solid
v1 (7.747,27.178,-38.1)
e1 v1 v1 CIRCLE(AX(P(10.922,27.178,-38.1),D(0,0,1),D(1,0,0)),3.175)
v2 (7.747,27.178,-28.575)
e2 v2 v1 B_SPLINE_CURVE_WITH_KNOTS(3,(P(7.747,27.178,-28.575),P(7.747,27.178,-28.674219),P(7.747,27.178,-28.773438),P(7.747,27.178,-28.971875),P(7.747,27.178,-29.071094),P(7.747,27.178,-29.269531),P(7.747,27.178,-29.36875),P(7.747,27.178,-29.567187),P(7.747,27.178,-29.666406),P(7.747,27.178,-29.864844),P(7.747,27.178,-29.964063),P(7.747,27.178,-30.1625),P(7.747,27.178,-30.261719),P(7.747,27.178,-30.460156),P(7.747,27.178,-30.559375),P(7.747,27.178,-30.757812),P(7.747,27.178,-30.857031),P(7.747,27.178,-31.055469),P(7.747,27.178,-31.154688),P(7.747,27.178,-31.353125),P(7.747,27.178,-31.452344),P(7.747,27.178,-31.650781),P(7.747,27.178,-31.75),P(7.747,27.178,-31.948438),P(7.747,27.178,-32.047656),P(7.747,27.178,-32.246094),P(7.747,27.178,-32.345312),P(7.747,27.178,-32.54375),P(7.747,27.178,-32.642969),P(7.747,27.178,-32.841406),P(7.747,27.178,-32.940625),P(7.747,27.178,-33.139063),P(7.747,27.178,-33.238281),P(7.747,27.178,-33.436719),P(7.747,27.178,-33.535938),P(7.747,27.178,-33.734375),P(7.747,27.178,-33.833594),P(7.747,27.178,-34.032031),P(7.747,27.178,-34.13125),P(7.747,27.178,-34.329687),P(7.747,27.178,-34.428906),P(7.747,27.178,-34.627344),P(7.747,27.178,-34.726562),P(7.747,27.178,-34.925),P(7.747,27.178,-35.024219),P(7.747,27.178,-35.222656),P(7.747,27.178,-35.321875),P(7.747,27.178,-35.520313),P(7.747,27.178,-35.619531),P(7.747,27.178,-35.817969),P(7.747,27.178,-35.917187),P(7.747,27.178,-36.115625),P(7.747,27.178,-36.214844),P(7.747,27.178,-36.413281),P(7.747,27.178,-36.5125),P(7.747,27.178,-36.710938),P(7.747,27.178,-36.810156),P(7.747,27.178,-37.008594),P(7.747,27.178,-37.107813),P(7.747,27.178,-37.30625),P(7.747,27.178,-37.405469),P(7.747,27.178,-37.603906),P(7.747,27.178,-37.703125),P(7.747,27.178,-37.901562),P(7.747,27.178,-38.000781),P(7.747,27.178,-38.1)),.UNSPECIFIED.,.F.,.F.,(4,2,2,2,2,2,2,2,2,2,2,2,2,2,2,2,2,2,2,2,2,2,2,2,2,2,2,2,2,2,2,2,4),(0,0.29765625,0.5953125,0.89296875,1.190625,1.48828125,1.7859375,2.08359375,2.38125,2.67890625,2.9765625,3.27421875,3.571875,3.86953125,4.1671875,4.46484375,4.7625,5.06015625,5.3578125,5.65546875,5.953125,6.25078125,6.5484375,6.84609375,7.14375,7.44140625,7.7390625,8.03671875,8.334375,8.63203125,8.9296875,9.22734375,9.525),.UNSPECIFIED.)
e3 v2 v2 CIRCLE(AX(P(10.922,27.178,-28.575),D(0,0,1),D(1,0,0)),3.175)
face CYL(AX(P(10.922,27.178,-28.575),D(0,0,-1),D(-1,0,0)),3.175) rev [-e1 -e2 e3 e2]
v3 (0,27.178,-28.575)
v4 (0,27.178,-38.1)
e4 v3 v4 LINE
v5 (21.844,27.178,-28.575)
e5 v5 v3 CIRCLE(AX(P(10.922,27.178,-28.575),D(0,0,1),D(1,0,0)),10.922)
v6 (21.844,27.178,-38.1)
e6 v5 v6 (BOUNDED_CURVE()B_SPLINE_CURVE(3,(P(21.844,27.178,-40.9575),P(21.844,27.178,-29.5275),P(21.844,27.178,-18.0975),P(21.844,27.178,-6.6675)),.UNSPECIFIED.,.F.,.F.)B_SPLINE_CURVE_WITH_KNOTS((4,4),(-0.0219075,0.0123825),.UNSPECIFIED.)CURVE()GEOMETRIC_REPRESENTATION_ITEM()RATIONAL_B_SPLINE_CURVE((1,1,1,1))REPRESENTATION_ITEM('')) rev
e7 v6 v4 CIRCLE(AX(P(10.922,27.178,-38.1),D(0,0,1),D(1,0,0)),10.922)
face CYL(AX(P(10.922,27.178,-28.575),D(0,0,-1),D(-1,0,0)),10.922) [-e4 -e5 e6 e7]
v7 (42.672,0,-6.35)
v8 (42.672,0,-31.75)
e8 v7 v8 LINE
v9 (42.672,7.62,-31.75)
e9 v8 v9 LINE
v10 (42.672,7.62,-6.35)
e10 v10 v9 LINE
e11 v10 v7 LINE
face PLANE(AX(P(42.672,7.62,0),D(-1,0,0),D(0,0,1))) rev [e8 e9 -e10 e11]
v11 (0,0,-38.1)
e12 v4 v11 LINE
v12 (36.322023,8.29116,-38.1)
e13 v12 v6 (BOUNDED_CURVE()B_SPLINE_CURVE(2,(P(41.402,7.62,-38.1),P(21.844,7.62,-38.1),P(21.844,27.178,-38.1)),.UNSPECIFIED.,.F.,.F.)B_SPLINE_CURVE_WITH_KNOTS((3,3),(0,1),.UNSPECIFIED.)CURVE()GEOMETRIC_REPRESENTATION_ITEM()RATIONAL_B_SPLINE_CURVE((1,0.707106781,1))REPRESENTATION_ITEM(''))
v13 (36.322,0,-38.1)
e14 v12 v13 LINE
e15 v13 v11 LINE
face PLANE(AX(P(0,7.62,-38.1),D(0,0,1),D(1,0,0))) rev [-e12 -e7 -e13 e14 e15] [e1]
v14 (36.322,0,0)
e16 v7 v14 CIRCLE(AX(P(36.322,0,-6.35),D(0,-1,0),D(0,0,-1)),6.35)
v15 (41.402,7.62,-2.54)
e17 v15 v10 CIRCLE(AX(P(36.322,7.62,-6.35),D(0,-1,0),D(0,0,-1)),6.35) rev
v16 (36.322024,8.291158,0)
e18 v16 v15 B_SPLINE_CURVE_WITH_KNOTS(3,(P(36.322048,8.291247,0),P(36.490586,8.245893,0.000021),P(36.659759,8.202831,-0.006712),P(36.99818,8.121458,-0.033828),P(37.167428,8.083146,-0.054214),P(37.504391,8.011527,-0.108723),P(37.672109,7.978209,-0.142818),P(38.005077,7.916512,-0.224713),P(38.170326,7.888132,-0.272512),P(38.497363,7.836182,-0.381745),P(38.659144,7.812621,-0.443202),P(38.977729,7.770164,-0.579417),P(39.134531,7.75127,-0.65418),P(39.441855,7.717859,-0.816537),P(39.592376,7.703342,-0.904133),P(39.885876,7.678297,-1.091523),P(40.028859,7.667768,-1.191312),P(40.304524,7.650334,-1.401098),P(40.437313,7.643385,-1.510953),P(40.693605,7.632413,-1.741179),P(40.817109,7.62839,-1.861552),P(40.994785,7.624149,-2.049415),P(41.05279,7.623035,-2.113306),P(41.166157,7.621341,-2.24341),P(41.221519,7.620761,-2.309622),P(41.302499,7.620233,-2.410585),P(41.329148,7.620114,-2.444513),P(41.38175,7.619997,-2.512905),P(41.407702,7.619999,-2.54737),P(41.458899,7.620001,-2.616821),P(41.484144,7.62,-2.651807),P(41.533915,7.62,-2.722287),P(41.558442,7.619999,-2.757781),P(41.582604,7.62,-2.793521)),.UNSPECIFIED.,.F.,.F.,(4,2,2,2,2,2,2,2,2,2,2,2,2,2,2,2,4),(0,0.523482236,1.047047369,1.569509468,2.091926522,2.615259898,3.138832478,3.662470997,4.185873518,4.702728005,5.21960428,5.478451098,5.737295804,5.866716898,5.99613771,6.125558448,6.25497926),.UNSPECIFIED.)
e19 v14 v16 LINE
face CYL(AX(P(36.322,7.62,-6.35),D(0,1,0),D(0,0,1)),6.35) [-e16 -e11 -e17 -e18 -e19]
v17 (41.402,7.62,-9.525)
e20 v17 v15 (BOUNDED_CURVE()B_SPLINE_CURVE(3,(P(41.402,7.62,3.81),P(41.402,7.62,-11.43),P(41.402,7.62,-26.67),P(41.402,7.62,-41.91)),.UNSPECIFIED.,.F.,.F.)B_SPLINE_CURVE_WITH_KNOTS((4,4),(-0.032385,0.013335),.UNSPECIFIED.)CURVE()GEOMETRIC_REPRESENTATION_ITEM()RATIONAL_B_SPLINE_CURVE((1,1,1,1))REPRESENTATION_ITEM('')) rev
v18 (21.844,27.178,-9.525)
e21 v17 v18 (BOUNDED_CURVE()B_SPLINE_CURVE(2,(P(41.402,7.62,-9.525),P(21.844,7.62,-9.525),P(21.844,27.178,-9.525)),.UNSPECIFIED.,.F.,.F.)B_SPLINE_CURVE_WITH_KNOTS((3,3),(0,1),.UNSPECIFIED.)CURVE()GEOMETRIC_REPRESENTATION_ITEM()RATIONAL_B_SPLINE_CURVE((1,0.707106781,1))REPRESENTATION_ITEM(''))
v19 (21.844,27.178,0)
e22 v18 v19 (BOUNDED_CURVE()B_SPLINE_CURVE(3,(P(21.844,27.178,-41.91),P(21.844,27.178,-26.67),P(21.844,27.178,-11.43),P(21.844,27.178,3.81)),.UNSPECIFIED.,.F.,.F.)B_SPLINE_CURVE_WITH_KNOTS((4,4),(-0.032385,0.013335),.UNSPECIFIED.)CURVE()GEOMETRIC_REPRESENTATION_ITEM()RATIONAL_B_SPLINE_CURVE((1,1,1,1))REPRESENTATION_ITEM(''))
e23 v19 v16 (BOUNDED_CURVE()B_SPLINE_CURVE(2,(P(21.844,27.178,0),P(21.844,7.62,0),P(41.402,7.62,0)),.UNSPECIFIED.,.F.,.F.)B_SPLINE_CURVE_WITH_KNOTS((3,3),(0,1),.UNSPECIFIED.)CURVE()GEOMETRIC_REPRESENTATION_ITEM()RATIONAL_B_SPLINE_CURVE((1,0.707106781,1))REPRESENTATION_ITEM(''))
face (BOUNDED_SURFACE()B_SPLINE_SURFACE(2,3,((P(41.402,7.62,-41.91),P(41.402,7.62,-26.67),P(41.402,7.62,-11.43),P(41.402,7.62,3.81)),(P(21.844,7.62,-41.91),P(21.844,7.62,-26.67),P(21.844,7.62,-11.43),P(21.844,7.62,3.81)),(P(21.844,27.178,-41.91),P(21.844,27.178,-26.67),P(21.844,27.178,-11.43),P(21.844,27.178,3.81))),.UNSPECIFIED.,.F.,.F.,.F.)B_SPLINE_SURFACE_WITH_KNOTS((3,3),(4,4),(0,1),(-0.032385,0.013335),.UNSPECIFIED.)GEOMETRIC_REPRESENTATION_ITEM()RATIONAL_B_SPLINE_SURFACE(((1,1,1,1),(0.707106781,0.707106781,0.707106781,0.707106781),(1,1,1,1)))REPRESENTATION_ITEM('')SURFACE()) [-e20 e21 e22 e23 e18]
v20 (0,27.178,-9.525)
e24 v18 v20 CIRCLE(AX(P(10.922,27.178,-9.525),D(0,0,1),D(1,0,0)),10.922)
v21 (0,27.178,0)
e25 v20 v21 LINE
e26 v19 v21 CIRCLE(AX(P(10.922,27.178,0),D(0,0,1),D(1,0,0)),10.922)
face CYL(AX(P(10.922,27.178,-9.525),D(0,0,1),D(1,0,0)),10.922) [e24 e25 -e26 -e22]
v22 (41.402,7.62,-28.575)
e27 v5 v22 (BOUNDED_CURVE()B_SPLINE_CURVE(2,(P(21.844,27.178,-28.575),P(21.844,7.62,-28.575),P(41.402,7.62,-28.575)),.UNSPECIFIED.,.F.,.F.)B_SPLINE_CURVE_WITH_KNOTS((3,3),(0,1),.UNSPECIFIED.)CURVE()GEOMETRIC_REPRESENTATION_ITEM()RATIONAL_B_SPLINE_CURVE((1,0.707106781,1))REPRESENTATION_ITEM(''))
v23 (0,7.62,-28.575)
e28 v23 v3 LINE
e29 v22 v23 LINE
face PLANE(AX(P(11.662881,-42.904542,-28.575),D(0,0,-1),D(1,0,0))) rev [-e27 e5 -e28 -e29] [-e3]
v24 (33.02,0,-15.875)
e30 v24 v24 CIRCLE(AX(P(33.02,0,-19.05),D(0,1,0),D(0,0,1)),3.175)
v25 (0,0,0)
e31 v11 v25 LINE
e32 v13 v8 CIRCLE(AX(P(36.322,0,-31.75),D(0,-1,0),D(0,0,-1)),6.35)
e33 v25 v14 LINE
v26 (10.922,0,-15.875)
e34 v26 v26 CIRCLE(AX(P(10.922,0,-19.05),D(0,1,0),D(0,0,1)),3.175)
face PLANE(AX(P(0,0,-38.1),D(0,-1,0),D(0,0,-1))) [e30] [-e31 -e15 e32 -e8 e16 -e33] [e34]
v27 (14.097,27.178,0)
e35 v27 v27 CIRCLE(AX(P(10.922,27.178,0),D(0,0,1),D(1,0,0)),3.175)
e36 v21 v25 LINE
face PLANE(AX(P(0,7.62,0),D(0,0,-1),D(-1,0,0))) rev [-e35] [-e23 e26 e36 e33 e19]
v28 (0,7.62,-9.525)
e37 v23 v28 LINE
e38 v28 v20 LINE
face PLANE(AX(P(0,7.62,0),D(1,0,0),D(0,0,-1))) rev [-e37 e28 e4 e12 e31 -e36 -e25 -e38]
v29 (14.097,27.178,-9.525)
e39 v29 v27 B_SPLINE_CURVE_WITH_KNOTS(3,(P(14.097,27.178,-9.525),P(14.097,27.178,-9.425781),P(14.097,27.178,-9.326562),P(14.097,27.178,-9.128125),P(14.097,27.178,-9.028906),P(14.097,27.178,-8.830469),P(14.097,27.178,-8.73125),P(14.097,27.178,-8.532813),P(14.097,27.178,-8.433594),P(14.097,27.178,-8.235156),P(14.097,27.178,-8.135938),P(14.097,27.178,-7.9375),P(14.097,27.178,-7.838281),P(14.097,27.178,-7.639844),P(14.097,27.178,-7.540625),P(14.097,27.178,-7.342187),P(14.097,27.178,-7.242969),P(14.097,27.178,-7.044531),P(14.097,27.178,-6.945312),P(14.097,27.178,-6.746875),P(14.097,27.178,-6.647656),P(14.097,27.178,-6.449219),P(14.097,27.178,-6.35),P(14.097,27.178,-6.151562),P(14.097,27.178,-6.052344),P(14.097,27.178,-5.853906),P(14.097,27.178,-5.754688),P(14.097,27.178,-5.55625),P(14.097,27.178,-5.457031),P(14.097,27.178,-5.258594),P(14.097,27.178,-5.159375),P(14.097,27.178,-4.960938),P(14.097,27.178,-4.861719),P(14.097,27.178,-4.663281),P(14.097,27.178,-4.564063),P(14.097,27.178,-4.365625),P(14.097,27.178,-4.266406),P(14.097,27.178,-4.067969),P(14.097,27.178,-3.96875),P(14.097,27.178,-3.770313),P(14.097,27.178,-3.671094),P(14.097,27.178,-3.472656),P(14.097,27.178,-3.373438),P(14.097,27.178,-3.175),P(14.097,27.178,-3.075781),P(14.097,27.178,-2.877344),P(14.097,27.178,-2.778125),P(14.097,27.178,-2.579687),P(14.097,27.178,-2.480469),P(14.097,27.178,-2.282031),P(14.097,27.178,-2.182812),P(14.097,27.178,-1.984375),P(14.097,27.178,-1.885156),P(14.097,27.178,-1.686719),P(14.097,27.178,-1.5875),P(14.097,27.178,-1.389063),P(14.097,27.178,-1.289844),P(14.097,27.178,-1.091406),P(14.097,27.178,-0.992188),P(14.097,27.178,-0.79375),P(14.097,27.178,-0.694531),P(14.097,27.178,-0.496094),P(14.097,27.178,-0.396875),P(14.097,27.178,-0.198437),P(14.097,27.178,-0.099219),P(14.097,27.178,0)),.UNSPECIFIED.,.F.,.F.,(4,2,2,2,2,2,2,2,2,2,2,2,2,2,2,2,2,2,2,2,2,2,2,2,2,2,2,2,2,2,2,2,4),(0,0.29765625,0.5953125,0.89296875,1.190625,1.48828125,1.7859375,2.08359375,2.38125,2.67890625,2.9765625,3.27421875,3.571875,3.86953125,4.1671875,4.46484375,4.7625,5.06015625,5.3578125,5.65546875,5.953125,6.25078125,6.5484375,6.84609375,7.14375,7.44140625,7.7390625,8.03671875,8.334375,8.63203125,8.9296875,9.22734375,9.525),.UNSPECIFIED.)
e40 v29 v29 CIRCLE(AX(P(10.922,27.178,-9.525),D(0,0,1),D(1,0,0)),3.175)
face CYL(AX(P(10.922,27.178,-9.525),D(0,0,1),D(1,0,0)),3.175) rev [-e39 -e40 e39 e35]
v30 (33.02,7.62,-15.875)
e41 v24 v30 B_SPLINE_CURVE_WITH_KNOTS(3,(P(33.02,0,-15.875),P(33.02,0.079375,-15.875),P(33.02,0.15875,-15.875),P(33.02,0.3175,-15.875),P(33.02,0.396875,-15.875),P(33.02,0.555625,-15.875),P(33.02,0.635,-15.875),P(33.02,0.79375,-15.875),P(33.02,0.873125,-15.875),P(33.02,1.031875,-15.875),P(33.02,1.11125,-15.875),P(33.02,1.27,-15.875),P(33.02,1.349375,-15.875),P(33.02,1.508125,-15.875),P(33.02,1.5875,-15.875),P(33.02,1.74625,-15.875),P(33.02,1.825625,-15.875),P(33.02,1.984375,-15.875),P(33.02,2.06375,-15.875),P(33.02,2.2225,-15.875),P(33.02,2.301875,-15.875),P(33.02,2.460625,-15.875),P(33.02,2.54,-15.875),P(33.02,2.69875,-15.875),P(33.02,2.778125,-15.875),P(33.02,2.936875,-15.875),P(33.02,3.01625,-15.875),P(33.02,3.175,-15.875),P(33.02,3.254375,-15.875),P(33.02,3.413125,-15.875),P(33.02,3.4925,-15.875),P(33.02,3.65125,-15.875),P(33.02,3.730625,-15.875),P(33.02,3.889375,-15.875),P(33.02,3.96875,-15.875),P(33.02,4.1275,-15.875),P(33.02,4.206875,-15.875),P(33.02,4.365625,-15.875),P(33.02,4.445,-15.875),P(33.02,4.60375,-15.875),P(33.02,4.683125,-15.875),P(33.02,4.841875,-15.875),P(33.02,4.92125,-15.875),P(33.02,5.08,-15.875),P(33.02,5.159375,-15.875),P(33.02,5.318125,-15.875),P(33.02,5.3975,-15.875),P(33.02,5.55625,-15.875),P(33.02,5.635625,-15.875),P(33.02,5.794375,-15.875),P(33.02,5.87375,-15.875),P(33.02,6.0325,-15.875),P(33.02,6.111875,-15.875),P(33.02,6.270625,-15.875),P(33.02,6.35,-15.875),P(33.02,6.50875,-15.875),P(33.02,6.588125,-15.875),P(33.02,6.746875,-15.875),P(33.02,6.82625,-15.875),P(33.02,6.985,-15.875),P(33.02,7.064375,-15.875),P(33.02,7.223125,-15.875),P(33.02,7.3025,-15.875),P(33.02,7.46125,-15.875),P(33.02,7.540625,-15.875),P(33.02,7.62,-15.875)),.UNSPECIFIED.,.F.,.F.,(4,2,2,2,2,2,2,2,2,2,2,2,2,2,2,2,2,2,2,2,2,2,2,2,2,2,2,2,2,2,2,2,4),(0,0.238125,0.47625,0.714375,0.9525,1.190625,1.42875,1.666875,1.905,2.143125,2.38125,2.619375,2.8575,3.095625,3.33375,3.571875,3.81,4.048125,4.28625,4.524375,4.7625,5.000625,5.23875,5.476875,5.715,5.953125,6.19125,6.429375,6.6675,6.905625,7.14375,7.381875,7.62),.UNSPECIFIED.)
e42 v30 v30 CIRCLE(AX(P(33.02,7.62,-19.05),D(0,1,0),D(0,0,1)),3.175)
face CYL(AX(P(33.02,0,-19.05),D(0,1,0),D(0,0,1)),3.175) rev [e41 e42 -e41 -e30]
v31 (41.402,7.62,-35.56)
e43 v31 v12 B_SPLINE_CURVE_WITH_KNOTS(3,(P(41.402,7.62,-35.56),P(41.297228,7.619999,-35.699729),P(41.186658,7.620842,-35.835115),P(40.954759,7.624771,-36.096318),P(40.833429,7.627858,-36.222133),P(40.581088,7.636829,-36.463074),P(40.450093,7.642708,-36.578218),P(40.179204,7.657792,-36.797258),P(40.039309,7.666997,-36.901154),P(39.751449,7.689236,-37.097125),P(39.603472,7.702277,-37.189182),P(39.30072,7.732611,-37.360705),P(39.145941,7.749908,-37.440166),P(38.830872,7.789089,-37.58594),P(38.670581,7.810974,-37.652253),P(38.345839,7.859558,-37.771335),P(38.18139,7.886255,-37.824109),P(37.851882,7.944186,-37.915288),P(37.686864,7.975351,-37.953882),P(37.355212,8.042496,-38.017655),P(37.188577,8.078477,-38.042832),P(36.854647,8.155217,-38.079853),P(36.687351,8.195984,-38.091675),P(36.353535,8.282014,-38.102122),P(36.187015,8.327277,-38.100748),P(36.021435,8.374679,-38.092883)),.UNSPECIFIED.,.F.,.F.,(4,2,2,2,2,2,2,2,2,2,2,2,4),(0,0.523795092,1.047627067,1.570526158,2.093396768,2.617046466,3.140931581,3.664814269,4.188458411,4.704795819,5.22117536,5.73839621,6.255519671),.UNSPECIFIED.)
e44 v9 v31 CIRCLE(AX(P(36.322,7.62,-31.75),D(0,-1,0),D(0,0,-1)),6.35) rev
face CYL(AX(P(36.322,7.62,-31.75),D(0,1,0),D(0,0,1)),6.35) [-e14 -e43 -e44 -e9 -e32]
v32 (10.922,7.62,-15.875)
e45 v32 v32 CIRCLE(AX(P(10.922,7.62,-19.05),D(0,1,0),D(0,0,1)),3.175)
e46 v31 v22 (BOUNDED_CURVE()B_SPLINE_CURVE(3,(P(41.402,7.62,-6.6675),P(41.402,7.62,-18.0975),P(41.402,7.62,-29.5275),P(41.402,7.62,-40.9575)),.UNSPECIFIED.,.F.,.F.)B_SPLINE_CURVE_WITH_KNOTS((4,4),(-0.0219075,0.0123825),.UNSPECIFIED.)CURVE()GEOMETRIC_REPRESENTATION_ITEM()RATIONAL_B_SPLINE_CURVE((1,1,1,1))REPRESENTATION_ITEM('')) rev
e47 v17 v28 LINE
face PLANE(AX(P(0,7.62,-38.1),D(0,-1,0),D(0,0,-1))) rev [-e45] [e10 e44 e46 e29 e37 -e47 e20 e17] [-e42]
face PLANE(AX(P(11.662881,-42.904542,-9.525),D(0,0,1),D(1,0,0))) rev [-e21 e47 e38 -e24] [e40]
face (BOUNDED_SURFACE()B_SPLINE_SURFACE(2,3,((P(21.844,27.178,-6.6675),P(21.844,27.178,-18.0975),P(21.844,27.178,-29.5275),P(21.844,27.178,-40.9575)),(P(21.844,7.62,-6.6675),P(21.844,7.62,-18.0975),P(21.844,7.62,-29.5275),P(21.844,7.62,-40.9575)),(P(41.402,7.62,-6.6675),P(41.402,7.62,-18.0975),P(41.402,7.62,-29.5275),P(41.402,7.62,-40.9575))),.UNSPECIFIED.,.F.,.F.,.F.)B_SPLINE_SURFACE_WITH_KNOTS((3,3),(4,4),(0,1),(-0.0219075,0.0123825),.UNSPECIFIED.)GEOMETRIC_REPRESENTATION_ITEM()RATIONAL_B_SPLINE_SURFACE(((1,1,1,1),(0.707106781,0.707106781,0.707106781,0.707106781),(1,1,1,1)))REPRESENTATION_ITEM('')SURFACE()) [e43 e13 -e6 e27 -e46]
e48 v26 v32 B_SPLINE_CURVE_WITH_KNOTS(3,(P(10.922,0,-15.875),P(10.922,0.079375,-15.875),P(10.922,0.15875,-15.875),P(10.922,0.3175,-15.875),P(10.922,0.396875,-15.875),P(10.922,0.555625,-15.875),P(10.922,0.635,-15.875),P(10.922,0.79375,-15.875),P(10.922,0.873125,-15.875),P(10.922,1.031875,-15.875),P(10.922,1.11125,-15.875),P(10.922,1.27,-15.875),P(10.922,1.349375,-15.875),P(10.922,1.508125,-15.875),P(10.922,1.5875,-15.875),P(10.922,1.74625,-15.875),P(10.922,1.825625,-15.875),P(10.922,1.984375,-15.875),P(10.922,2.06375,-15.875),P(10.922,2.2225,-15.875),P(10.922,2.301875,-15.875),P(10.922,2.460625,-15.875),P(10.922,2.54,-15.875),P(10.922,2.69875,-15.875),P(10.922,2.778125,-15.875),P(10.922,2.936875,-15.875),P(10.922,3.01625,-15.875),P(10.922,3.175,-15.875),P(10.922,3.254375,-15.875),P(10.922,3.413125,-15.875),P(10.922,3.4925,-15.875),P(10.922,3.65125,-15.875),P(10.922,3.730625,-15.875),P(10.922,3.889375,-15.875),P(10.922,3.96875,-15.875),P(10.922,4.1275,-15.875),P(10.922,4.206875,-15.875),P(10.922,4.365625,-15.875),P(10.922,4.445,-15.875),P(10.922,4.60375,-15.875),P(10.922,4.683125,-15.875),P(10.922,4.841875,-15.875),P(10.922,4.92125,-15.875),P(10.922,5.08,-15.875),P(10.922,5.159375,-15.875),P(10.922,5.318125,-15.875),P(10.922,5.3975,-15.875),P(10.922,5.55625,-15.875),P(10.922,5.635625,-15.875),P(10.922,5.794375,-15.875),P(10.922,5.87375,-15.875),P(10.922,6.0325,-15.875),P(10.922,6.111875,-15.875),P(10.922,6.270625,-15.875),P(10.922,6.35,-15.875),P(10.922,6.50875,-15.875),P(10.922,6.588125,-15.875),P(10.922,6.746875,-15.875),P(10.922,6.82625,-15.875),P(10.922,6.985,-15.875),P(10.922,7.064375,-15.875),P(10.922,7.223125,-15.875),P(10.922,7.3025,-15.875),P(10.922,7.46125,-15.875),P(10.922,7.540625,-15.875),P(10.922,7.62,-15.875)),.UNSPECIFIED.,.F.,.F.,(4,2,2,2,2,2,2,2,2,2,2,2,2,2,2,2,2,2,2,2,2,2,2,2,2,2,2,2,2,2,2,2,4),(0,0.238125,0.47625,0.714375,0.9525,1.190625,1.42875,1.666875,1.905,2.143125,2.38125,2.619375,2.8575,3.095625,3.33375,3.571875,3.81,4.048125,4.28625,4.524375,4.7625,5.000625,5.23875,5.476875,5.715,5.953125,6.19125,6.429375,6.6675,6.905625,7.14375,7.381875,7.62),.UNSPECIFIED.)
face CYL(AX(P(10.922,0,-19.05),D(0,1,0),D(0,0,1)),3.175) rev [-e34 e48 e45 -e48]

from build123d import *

# Parameters (mm, degrees)
SKETCH1_W           = 42.672
SKETCH1_H           = 38.1
BOSS_EXTRUDE1_DEPTH = 7.62
SKETCH3_R           = 3.175
CUT_EXTRUDE1_DEPTH  = 7.62
SKETCH4_R           = 10.922
SKETCH4_R_2         = 3.175
BOSS_EXTRUDE2_DEPTH = 9.525
FILLET1_START       = -9.525
FILLET1_DEPTH       = 9.525
FILLET2_R           = 6.35
FILLET3_R           = 6.35


with BuildPart() as part:
    # Sketch1 → Boss-Extrude1 (new body)
    with BuildSketch(Plane(origin=(0, 0, 0), x_dir=(1, 0, 0), z_dir=(0, 1, 0))):
        with Locations((21.336, 19.05)):
            Rectangle(SKETCH1_W, SKETCH1_H)
    extrude(amount=BOSS_EXTRUDE1_DEPTH)

    # Sketch3 → Cut-Extrude1 (cut)
    with BuildSketch(Plane(origin=(0, 7.62, 0), x_dir=(-1, 0, 0), z_dir=(0, 1, 0))):
        with Locations(Location((-10.922, -19.05, 0), (0, 0, 90))):
            Circle(SKETCH3_R)
        with Locations(Location((-33.02, -19.05, 0), (0, 0, 90))):
            Circle(SKETCH3_R)
    extrude(amount=-CUT_EXTRUDE1_DEPTH, mode=Mode.SUBTRACT)

    # Sketch4 → Boss-Extrude2 (add)
    # profile 1 of 2: a face of its own
    with BuildSketch(Plane.XY):
        with BuildLine():
            Line((0, 27.178), (0, 7.62))
            Line((0, 7.62), (21.844, 7.62))
            Line((21.844, 7.62), (21.844, 27.178))
            ThreePointArc((21.844, 27.178), (10.922, 16.256), (0, 27.178))
        make_face()
    # profile 2 of 2: a face of its own
    with BuildSketch(Plane.XY):
        with Locations((10.922, 27.178)):
            Circle(SKETCH4_R)
        with Locations((10.922, 27.178)):
            Circle(SKETCH4_R_2, mode=Mode.SUBTRACT)
    boss_extrude2 = extrude(amount=-BOSS_EXTRUDE2_DEPTH)

    # Fillet1: read off the stored shape, not the designer's step
    # Fillet1 outline → Fillet1 (add)
    with BuildSketch(Plane.XY.offset(FILLET1_START)):
        with BuildLine():
            Line((21.844, 7.62), (41.402, 7.62))
            add(Edge.make_bspline(
                [(41.402, 7.62), (21.844, 7.62), (21.844, 27.178)],
                knots=[0, 0, 0, 1, 1, 1], degree=2, weights=[1, 0.707106781, 1]))
            Line((21.844, 27.178), (21.844, 7.62))
        make_face()
    fillet1 = extrude(amount=FILLET1_DEPTH)

    # Fillet2
    fillet2_edges = [part.edges().sort_by_distance(p)[0] for p in [
        (42.672, 3.81, 0),
    ]]
    fillet(fillet2_edges, radius=FILLET2_R)

    # Mirror2: Boss-Extrude2, Fillet1 across plane
    add(boss_extrude2.mirror(Plane.XY.offset(-19.05)))
    add(fillet1.mirror(Plane.XY.offset(-19.05)))

    # Fillet3
    fillet3_edges = [part.edges().sort_by_distance(p)[0] for p in [
        (42.672, 3.81, -38.1),
    ]]
    fillet(fillet3_edges, radius=FILLET3_R)


solid = part.part
